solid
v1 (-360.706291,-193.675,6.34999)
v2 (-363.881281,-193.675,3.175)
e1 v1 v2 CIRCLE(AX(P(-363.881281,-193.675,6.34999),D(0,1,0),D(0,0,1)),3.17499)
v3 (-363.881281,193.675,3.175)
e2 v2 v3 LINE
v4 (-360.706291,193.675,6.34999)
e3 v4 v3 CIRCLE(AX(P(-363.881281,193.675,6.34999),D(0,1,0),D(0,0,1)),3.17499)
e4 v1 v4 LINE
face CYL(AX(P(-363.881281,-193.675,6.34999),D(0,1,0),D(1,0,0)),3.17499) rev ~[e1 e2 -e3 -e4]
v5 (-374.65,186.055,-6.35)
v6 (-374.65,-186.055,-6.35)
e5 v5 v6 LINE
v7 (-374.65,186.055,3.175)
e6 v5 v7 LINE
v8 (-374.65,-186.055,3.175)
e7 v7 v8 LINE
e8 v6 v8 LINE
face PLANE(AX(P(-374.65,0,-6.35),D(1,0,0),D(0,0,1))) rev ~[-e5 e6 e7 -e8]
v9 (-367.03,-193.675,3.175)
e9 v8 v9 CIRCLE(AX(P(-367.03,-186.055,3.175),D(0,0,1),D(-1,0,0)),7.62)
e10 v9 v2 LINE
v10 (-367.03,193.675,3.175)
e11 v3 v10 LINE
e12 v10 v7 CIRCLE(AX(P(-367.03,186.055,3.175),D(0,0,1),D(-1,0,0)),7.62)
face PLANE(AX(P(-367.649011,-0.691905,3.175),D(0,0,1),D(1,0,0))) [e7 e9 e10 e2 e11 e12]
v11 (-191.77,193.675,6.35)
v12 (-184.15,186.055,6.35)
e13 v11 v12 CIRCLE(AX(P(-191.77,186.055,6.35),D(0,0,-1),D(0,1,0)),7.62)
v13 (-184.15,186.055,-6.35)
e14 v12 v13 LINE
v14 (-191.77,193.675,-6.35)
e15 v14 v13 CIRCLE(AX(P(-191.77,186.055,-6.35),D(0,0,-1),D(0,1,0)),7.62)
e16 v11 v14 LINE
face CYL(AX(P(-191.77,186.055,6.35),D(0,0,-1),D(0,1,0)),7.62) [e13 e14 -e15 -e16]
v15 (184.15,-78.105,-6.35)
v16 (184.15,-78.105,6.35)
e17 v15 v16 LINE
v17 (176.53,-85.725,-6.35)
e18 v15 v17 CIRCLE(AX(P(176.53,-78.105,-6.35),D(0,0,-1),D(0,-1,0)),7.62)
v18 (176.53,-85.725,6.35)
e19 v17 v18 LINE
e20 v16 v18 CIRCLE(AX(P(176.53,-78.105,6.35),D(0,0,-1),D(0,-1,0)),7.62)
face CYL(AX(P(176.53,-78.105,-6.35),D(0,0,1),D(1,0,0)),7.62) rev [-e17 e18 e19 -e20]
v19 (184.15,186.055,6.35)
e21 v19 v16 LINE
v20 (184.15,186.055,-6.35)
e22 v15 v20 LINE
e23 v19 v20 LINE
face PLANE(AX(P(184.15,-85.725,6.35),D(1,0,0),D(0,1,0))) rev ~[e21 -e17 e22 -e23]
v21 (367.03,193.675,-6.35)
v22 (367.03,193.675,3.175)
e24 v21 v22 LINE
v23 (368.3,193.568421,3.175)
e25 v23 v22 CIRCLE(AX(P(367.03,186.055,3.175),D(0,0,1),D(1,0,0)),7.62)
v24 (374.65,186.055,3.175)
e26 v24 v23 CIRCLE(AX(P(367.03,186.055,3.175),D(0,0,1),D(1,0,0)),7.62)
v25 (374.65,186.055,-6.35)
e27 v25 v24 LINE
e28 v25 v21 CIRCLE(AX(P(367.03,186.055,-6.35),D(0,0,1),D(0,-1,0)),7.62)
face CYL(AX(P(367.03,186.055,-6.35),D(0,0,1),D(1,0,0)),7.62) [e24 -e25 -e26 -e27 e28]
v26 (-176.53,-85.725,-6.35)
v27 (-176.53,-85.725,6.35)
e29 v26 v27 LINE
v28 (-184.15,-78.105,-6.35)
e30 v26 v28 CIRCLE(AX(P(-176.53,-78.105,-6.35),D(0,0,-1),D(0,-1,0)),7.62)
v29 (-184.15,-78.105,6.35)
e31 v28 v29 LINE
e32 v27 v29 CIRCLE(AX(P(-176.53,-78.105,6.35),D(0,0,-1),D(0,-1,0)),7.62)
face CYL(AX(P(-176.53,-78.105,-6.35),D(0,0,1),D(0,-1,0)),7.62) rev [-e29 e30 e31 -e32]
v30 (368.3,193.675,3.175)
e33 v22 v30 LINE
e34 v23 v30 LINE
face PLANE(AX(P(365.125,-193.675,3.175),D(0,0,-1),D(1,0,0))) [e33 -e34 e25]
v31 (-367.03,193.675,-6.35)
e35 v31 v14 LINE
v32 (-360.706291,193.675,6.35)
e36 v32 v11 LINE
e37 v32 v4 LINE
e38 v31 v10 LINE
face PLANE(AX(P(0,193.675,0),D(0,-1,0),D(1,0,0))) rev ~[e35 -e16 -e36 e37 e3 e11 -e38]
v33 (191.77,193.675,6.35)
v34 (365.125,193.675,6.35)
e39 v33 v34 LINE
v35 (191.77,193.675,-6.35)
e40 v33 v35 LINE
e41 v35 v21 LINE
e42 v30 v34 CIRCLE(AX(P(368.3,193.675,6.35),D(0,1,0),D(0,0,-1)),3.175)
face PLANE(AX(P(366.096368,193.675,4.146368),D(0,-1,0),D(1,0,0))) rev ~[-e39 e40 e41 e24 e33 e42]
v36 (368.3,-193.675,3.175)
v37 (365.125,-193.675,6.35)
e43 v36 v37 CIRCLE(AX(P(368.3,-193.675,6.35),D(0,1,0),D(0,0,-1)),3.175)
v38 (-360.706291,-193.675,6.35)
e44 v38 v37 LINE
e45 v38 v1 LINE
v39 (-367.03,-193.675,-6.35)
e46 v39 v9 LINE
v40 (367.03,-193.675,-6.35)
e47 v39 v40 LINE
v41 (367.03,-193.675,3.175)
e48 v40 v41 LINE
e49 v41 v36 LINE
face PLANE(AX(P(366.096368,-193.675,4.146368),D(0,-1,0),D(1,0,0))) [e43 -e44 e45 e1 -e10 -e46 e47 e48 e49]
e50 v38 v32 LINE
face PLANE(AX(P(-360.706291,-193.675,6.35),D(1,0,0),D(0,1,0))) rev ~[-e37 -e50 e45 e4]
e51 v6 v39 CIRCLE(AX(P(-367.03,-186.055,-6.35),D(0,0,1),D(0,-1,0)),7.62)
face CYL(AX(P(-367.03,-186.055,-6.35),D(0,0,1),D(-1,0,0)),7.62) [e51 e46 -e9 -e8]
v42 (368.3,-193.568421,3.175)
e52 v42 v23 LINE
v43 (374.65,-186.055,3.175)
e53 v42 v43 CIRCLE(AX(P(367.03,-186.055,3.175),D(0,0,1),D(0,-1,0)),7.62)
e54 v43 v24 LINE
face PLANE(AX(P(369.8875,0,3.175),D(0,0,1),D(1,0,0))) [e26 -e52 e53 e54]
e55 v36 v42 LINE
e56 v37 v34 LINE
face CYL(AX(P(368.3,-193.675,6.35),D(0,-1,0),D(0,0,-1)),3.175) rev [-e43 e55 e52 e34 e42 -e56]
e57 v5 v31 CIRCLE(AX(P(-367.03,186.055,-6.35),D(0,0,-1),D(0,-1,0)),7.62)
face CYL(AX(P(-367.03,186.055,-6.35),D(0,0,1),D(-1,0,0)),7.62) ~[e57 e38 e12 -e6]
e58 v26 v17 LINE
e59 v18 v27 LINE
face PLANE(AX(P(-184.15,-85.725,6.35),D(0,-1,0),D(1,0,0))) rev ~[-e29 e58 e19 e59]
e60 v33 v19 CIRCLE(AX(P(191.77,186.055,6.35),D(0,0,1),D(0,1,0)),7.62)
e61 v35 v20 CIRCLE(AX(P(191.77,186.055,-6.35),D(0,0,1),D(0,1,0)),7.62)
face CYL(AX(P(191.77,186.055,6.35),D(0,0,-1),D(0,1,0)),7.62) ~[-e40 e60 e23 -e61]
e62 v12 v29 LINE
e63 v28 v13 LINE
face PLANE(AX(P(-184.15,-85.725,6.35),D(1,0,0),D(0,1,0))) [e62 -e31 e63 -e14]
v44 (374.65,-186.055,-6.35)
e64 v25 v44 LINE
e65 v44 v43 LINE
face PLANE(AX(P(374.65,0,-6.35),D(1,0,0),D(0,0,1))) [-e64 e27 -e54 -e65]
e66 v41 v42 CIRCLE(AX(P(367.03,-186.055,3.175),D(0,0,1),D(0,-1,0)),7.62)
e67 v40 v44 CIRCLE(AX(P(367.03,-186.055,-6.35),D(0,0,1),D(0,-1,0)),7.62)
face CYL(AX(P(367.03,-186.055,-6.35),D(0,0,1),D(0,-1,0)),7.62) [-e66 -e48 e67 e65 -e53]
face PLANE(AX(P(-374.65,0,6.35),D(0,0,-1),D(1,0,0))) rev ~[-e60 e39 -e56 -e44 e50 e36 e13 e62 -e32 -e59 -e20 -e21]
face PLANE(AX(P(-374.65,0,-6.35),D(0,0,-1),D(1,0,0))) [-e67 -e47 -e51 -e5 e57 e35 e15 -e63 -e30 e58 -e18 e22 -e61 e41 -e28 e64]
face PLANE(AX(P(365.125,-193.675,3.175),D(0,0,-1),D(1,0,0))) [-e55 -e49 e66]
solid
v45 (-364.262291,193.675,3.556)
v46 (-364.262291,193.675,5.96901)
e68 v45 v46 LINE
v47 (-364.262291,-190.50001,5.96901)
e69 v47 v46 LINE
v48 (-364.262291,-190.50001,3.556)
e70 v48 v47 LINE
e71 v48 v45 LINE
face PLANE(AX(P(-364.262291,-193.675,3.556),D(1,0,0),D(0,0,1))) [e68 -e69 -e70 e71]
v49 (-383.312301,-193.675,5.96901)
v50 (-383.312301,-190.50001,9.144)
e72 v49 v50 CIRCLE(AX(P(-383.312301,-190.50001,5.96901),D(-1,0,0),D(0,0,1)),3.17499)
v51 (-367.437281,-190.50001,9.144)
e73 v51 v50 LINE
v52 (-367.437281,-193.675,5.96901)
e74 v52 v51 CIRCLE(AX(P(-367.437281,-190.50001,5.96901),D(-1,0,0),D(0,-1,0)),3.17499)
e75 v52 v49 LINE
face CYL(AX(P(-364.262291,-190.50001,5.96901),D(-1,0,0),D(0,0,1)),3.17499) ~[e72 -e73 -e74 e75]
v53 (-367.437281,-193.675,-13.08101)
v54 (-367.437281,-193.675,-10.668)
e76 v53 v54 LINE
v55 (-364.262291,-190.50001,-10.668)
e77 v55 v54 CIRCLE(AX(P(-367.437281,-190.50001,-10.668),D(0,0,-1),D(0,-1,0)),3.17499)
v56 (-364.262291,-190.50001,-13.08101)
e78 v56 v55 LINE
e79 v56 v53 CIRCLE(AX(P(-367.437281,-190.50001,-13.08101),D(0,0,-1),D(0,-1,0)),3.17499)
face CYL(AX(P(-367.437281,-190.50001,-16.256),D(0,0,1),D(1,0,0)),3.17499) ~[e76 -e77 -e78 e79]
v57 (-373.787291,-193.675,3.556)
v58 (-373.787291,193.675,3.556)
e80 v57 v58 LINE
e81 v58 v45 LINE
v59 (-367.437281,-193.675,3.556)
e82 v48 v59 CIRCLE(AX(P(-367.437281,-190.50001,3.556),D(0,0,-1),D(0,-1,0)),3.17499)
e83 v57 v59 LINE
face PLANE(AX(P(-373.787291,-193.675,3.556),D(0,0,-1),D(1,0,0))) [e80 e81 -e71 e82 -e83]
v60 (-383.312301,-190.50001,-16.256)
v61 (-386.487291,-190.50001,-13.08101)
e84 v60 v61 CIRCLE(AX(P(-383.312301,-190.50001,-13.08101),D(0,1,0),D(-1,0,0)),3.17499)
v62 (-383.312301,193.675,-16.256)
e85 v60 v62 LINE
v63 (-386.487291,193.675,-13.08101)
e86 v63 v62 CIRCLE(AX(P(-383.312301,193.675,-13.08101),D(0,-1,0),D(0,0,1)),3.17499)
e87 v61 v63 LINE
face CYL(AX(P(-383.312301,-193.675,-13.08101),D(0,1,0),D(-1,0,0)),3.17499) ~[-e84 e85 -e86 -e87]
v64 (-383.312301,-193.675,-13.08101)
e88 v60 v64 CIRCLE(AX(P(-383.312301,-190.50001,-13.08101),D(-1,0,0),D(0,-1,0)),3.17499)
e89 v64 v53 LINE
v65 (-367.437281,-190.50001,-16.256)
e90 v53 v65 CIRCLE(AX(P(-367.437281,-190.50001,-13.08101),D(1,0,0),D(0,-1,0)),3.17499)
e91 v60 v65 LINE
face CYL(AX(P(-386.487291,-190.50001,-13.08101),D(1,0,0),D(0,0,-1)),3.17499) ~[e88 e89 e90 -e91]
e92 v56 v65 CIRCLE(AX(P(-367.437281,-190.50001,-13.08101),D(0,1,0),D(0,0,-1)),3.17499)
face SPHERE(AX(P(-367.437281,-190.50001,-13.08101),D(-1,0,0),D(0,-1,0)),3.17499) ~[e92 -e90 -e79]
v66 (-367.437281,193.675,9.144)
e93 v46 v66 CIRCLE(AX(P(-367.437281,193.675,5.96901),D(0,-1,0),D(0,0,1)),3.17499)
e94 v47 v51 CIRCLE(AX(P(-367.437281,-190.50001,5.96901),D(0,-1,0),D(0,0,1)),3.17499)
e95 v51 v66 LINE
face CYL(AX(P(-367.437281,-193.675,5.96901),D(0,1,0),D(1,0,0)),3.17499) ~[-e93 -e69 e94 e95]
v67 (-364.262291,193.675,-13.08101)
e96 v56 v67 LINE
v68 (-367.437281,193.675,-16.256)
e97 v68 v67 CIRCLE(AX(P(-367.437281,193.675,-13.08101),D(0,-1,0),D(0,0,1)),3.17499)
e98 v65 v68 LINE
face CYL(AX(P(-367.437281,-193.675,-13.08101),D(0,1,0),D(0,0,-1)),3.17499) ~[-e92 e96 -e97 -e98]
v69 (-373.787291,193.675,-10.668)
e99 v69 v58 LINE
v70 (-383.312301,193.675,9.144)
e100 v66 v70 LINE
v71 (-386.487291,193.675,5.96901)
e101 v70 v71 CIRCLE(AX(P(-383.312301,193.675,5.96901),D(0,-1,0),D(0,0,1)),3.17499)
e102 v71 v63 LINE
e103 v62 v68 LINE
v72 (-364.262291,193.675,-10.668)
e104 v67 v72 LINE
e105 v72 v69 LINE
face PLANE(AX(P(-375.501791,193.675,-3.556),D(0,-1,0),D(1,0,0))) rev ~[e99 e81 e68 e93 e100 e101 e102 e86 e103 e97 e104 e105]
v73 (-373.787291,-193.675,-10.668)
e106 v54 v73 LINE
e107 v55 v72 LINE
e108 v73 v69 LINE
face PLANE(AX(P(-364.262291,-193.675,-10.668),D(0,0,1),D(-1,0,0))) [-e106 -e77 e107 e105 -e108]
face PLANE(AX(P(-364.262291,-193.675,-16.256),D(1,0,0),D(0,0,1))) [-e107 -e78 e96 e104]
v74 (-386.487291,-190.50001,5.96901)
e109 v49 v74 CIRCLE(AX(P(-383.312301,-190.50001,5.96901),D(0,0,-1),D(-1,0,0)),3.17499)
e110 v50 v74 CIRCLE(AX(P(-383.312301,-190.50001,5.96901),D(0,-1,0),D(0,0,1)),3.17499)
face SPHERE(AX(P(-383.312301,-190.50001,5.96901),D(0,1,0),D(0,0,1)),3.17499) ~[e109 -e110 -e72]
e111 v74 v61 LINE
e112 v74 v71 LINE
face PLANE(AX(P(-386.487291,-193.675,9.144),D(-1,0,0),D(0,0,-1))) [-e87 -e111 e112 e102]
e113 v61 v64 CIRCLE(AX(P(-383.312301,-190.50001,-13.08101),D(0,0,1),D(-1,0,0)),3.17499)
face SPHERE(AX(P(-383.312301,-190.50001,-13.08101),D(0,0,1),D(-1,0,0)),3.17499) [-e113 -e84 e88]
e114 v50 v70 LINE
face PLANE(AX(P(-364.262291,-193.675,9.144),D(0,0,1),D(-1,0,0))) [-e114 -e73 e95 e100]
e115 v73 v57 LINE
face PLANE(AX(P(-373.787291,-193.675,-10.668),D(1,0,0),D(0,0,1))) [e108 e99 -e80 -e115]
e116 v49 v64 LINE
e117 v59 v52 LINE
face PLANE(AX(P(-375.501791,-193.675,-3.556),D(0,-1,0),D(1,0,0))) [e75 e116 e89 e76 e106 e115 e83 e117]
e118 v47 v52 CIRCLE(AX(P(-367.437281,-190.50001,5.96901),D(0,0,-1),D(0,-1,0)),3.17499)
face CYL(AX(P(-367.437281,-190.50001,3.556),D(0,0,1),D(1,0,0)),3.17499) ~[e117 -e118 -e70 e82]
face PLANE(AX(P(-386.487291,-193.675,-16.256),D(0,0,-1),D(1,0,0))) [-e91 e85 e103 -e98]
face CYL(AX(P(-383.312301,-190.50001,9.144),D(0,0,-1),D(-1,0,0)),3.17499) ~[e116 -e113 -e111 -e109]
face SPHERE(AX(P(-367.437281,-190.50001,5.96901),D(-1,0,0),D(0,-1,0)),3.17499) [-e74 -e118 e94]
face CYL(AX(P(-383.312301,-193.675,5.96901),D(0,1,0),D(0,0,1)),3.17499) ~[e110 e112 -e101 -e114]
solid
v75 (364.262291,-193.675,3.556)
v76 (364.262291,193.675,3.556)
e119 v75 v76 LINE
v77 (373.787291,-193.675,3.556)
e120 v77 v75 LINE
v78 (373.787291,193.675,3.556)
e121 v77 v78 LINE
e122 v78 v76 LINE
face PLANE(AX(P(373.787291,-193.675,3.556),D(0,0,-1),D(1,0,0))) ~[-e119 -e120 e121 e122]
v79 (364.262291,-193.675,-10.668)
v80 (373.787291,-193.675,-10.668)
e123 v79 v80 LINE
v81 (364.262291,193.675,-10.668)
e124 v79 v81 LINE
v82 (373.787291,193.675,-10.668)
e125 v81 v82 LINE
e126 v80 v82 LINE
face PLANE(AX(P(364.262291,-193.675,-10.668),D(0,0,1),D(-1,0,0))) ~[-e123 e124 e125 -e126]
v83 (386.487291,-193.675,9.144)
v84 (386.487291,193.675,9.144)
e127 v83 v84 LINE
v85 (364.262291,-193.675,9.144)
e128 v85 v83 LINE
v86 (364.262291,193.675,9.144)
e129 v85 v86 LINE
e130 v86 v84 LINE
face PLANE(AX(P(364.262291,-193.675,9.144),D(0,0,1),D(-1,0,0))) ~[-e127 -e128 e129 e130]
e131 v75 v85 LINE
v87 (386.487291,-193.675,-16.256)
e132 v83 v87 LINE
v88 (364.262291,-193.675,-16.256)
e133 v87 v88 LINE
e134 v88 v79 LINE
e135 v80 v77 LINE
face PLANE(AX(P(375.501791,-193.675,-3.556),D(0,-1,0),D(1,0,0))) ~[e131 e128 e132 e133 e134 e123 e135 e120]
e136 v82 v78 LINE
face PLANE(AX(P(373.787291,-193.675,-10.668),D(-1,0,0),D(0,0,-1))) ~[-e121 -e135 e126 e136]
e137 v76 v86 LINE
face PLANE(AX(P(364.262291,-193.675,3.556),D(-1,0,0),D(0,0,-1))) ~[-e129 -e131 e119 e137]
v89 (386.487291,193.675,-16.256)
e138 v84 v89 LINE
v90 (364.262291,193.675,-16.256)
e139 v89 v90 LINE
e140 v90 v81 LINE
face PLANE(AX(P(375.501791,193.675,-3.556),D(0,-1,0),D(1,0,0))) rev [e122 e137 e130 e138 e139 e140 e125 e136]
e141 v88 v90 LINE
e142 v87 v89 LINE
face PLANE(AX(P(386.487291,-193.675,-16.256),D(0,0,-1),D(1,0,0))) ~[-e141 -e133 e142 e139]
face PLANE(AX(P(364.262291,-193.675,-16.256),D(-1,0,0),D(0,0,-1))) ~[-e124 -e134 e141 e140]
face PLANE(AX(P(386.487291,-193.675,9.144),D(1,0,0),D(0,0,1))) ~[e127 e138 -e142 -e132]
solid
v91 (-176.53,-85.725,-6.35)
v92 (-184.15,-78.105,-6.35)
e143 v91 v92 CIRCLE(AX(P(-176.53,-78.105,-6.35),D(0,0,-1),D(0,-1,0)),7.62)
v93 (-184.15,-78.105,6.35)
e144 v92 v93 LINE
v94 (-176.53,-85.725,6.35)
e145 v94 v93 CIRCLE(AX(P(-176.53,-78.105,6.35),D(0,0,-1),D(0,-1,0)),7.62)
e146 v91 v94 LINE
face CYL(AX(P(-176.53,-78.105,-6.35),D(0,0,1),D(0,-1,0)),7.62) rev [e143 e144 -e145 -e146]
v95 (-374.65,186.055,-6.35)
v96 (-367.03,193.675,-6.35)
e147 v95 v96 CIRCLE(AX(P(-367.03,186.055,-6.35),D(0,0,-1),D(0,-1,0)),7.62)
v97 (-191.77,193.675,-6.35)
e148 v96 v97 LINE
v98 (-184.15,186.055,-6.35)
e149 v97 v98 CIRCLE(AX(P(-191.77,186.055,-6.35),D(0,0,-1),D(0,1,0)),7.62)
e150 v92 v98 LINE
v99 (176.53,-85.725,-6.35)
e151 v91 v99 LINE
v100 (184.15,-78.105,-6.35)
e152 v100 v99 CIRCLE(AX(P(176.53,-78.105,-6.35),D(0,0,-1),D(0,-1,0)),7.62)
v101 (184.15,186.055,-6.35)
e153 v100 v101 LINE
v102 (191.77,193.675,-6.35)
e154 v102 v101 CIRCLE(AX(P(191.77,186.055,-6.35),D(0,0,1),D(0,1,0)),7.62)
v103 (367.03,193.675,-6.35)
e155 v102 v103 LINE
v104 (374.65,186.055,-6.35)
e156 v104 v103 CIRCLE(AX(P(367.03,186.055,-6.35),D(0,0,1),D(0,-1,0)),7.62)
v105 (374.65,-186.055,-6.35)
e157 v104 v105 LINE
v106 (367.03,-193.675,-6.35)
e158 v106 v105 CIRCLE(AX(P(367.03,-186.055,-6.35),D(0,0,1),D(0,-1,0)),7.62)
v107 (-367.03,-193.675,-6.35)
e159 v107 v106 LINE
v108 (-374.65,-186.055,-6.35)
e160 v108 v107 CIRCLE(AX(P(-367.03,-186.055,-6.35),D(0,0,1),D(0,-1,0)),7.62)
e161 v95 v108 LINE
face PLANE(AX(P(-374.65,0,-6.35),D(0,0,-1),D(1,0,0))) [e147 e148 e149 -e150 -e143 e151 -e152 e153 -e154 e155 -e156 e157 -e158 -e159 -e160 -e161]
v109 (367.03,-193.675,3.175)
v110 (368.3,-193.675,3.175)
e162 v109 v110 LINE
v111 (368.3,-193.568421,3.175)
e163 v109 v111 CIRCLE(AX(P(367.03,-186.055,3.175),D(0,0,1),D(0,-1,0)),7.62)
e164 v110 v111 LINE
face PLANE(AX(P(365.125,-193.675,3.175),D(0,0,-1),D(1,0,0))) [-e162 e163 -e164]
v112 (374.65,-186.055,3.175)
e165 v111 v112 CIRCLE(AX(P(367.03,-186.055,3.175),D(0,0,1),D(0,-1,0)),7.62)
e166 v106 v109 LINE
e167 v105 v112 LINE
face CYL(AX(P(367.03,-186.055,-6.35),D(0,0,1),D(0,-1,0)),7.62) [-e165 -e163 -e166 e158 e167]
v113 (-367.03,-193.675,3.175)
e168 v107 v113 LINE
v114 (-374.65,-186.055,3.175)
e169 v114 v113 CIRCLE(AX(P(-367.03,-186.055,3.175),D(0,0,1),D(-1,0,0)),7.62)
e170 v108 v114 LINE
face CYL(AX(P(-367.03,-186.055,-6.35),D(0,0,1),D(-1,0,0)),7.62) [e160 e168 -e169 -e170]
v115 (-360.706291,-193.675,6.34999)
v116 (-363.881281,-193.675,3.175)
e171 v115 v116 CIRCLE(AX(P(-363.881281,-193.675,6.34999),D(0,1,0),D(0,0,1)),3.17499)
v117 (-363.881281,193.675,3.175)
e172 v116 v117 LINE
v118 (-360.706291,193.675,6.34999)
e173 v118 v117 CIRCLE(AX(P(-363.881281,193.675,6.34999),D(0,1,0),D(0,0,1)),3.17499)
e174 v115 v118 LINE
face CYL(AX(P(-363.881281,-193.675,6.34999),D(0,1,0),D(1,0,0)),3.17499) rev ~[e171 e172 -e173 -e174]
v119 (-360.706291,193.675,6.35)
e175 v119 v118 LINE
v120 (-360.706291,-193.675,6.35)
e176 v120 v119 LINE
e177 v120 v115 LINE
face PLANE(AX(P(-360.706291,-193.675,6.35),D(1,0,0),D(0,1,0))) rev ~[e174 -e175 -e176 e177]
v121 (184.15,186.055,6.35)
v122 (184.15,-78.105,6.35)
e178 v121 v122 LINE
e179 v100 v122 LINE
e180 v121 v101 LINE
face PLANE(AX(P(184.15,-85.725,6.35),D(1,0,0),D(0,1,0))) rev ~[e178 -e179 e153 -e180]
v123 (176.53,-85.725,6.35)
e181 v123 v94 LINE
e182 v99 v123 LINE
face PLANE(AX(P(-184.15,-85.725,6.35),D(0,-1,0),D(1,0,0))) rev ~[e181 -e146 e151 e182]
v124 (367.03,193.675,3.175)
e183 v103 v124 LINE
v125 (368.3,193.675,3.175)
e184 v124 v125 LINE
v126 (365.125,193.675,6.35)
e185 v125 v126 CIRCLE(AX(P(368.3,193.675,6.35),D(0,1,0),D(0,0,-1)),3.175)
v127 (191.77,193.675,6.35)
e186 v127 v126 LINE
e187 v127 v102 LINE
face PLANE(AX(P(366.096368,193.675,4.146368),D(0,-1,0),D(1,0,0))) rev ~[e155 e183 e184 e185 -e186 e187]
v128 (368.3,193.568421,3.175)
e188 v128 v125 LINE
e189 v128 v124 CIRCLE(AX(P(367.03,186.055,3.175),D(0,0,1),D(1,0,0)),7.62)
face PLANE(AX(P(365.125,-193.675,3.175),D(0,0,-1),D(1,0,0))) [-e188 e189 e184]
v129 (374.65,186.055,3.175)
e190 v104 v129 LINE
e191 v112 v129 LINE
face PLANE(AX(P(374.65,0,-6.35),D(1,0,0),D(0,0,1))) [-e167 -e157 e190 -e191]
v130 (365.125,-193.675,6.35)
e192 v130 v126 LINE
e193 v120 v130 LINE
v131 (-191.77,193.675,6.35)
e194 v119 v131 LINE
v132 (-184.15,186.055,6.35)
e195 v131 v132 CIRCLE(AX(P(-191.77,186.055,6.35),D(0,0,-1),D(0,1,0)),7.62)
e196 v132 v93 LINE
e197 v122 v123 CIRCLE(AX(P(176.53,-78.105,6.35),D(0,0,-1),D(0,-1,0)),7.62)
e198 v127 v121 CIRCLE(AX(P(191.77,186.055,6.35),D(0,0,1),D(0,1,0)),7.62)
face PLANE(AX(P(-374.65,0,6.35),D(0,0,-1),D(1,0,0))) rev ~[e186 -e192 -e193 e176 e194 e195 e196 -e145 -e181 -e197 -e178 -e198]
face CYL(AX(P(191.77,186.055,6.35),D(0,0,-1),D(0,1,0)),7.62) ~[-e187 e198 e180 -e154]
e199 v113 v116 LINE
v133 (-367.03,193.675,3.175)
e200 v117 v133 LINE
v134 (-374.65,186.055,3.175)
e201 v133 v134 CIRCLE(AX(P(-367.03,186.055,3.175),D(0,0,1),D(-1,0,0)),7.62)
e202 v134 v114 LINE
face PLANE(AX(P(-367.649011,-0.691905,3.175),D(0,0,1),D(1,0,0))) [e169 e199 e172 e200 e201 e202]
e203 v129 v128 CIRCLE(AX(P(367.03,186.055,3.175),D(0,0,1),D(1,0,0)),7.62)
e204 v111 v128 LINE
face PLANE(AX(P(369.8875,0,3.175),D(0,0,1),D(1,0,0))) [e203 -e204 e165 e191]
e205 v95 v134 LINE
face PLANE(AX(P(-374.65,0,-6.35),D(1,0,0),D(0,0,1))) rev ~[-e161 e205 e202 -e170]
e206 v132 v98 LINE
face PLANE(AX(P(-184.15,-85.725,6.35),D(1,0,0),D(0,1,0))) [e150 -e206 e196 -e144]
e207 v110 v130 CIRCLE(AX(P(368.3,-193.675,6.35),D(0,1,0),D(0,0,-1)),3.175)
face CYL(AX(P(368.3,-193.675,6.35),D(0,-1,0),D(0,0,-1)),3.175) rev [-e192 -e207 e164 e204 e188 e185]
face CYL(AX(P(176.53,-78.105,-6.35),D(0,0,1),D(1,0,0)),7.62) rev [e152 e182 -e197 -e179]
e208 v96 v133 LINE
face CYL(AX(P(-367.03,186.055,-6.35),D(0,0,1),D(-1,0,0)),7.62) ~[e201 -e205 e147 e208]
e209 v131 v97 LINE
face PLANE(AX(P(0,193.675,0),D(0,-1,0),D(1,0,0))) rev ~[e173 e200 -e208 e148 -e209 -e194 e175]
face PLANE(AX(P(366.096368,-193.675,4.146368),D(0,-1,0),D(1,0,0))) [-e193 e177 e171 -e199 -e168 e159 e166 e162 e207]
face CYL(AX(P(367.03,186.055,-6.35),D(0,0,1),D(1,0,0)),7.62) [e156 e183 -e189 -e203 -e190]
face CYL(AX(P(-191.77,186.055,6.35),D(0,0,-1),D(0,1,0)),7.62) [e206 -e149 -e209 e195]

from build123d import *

# Parameters (mm, degrees)
F0_W      = 749.3
F0_H      = 12.7
F1_DEPTH  = 193.675
F2_W      = 368.3
F2_H      = 279.4
F3_DEPTH  = 12.7
F4_R      = 7.62
F6_DEPTH  = 3.175
F9_W      = 9.525
F9_H      = 387.35
F10_DEPTH = 3.175
F12_DEPTH = 387.35
F14_DEPTH = 387.35
F16_R     = 3.17499
F16_2_R   = 3.17499
F16_3_R   = 3.17499


# Not quite as in the source:
# - a fillet or chamfer is up to 0.001 mm smaller than in the source, because OpenCascade refuses the exact size
# - a feature of the source that left no trace in its solid (it failed there, or was rolled back) is left out
# - a pattern or mirror of a feature is missing from the dataset's text; its kind, count and spacing are read off the source's solid


with BuildPart() as f1:
    # F0 (on Front) → F1 (new body, symmetric)
    with BuildSketch(Plane.XZ):
        Rectangle(F0_W, F0_H)
    extrude(amount=F1_DEPTH, both=True)

    # F2 (on face) → F3 (cut, symmetric)
    with BuildSketch(Plane.XY.offset(6.35)):
        with Locations((0, 53.975)):
            Rectangle(F2_W, F2_H)
    extrude(amount=F3_DEPTH, both=True, mode=Mode.SUBTRACT)

    # F4
    f4_edges = [f1.edges().sort_by_distance(p)[0] for p in [
        (-184.15, 193.675, 0),
        (-374.65, 193.675, 0),
        (-184.15, -85.725, 0),
        (184.15, -85.725, 0),
        (184.15, 193.675, 0),
        (374.65, 193.675, 0),
        (374.65, -193.675, 0),
        (-374.65, -193.675, 0),
    ]]
    fillet(f4_edges, radius=F4_R)

    # F5 (on face) → F6 (cut)
    with BuildSketch(Plane.XY.offset(6.35)):
        with BuildLine():
            Line((-360.706291008, -193.675), (-360.706291008, 193.675))
            Line((-360.706291008, 193.675), (-368.3, 193.675))
            ThreePointArc((-368.3, 193.675), (-372.7901280605, 191.8151280605), (-374.65, 187.325))
            Line((-374.65, 187.325), (-374.65, -193.675))
            Line((-374.65, -193.675), (-360.706291008, -193.675))
        make_face()
    extrude(amount=-F6_DEPTH, mode=Mode.SUBTRACT)

    # F9 (on face) → F10 (cut)
    with BuildSketch(Plane.XY.offset(6.35)):
        with Locations((369.8875, 0)):
            Rectangle(F9_W, F9_H)
    extrude(amount=-F10_DEPTH, mode=Mode.SUBTRACT)

    # F11 (on face) → F12 (join)
    with BuildSketch(Plane.XZ.offset(193.675)):
        with BuildLine():
            ThreePointArc((368.3, 3.175), (366.0549359697, 4.1049359697), (365.125, 6.35))
            Line((365.125, 6.35), (365.125, 3.175))
            Line((365.125, 3.175), (368.3, 3.175))
        make_face()
    extrude(amount=-F12_DEPTH)


with BuildPart() as f14:
    # F13 (on face) → F14 (new body)
    with BuildSketch(Plane.XZ.offset(193.675)):
        Polygon((-364.262291008, 3.556), (-364.262291008, 9.144), (-386.487291008, 9.144), (-386.487291008, -16.256), (-364.262291008, -16.256), (-364.262291008, -10.668), (-373.787291008, -10.668), (-373.787291008, 3.556), align=None)
    extrude(amount=-F14_DEPTH)


with BuildPart() as f14_copies_1:
    # F14_copies: instance of F14
    add(f14.part.mirror(Plane(origin=(0, 0, 0), x_dir=(0, 0, 1), z_dir=(1, 0, 0))))


with BuildPart() as f15_1:
    # F15: copy of F1
    add(f1.part)

    # F16#3 (radius 3.175 in the source; OpenCascade refuses exactly that, so slightly less here)
    f16_3_edges = [f15_1.edges().sort_by_distance(p)[0] for p in [
        (-360.706291, 0, 3.175),
    ]]
    fillet(f16_3_edges, radius=F16_3_R)


with BuildPart() as f14_1:
    add(f14.part)

    # F16 (radius 3.175 in the source; OpenCascade refuses exactly that, so slightly less here)
    f16_edges = [f14_1.edges().sort_by_distance(p)[0] for p in [
        (-386.487291, 0, 9.144),
        (-375.374791, -193.675, 9.144),
        (-386.487291, -193.675, -3.556),
        (-386.487291, 0, -16.256),
        (-375.374791, -193.675, -16.256),
        (-364.262291, -193.675, -13.462),
        (-364.262291, -193.675, 6.35),
        (-364.262291, 0, 9.144),
        (-364.262291, 0, -16.256),
    ]]
    fillet(f16_edges, radius=F16_R)


with BuildPart() as f1_1:
    add(f1.part)

    # F16#2 (radius 3.175 in the source; OpenCascade refuses exactly that, so slightly less here)
    f16_2_edges = [f1_1.edges().sort_by_distance(p)[0] for p in [
        (-360.706291, 0, 3.175),
    ]]
    fillet(f16_2_edges, radius=F16_2_R)


solid = Compound([f14_copies_1.part, f15_1.part, f14_1.part, f1_1.part])
